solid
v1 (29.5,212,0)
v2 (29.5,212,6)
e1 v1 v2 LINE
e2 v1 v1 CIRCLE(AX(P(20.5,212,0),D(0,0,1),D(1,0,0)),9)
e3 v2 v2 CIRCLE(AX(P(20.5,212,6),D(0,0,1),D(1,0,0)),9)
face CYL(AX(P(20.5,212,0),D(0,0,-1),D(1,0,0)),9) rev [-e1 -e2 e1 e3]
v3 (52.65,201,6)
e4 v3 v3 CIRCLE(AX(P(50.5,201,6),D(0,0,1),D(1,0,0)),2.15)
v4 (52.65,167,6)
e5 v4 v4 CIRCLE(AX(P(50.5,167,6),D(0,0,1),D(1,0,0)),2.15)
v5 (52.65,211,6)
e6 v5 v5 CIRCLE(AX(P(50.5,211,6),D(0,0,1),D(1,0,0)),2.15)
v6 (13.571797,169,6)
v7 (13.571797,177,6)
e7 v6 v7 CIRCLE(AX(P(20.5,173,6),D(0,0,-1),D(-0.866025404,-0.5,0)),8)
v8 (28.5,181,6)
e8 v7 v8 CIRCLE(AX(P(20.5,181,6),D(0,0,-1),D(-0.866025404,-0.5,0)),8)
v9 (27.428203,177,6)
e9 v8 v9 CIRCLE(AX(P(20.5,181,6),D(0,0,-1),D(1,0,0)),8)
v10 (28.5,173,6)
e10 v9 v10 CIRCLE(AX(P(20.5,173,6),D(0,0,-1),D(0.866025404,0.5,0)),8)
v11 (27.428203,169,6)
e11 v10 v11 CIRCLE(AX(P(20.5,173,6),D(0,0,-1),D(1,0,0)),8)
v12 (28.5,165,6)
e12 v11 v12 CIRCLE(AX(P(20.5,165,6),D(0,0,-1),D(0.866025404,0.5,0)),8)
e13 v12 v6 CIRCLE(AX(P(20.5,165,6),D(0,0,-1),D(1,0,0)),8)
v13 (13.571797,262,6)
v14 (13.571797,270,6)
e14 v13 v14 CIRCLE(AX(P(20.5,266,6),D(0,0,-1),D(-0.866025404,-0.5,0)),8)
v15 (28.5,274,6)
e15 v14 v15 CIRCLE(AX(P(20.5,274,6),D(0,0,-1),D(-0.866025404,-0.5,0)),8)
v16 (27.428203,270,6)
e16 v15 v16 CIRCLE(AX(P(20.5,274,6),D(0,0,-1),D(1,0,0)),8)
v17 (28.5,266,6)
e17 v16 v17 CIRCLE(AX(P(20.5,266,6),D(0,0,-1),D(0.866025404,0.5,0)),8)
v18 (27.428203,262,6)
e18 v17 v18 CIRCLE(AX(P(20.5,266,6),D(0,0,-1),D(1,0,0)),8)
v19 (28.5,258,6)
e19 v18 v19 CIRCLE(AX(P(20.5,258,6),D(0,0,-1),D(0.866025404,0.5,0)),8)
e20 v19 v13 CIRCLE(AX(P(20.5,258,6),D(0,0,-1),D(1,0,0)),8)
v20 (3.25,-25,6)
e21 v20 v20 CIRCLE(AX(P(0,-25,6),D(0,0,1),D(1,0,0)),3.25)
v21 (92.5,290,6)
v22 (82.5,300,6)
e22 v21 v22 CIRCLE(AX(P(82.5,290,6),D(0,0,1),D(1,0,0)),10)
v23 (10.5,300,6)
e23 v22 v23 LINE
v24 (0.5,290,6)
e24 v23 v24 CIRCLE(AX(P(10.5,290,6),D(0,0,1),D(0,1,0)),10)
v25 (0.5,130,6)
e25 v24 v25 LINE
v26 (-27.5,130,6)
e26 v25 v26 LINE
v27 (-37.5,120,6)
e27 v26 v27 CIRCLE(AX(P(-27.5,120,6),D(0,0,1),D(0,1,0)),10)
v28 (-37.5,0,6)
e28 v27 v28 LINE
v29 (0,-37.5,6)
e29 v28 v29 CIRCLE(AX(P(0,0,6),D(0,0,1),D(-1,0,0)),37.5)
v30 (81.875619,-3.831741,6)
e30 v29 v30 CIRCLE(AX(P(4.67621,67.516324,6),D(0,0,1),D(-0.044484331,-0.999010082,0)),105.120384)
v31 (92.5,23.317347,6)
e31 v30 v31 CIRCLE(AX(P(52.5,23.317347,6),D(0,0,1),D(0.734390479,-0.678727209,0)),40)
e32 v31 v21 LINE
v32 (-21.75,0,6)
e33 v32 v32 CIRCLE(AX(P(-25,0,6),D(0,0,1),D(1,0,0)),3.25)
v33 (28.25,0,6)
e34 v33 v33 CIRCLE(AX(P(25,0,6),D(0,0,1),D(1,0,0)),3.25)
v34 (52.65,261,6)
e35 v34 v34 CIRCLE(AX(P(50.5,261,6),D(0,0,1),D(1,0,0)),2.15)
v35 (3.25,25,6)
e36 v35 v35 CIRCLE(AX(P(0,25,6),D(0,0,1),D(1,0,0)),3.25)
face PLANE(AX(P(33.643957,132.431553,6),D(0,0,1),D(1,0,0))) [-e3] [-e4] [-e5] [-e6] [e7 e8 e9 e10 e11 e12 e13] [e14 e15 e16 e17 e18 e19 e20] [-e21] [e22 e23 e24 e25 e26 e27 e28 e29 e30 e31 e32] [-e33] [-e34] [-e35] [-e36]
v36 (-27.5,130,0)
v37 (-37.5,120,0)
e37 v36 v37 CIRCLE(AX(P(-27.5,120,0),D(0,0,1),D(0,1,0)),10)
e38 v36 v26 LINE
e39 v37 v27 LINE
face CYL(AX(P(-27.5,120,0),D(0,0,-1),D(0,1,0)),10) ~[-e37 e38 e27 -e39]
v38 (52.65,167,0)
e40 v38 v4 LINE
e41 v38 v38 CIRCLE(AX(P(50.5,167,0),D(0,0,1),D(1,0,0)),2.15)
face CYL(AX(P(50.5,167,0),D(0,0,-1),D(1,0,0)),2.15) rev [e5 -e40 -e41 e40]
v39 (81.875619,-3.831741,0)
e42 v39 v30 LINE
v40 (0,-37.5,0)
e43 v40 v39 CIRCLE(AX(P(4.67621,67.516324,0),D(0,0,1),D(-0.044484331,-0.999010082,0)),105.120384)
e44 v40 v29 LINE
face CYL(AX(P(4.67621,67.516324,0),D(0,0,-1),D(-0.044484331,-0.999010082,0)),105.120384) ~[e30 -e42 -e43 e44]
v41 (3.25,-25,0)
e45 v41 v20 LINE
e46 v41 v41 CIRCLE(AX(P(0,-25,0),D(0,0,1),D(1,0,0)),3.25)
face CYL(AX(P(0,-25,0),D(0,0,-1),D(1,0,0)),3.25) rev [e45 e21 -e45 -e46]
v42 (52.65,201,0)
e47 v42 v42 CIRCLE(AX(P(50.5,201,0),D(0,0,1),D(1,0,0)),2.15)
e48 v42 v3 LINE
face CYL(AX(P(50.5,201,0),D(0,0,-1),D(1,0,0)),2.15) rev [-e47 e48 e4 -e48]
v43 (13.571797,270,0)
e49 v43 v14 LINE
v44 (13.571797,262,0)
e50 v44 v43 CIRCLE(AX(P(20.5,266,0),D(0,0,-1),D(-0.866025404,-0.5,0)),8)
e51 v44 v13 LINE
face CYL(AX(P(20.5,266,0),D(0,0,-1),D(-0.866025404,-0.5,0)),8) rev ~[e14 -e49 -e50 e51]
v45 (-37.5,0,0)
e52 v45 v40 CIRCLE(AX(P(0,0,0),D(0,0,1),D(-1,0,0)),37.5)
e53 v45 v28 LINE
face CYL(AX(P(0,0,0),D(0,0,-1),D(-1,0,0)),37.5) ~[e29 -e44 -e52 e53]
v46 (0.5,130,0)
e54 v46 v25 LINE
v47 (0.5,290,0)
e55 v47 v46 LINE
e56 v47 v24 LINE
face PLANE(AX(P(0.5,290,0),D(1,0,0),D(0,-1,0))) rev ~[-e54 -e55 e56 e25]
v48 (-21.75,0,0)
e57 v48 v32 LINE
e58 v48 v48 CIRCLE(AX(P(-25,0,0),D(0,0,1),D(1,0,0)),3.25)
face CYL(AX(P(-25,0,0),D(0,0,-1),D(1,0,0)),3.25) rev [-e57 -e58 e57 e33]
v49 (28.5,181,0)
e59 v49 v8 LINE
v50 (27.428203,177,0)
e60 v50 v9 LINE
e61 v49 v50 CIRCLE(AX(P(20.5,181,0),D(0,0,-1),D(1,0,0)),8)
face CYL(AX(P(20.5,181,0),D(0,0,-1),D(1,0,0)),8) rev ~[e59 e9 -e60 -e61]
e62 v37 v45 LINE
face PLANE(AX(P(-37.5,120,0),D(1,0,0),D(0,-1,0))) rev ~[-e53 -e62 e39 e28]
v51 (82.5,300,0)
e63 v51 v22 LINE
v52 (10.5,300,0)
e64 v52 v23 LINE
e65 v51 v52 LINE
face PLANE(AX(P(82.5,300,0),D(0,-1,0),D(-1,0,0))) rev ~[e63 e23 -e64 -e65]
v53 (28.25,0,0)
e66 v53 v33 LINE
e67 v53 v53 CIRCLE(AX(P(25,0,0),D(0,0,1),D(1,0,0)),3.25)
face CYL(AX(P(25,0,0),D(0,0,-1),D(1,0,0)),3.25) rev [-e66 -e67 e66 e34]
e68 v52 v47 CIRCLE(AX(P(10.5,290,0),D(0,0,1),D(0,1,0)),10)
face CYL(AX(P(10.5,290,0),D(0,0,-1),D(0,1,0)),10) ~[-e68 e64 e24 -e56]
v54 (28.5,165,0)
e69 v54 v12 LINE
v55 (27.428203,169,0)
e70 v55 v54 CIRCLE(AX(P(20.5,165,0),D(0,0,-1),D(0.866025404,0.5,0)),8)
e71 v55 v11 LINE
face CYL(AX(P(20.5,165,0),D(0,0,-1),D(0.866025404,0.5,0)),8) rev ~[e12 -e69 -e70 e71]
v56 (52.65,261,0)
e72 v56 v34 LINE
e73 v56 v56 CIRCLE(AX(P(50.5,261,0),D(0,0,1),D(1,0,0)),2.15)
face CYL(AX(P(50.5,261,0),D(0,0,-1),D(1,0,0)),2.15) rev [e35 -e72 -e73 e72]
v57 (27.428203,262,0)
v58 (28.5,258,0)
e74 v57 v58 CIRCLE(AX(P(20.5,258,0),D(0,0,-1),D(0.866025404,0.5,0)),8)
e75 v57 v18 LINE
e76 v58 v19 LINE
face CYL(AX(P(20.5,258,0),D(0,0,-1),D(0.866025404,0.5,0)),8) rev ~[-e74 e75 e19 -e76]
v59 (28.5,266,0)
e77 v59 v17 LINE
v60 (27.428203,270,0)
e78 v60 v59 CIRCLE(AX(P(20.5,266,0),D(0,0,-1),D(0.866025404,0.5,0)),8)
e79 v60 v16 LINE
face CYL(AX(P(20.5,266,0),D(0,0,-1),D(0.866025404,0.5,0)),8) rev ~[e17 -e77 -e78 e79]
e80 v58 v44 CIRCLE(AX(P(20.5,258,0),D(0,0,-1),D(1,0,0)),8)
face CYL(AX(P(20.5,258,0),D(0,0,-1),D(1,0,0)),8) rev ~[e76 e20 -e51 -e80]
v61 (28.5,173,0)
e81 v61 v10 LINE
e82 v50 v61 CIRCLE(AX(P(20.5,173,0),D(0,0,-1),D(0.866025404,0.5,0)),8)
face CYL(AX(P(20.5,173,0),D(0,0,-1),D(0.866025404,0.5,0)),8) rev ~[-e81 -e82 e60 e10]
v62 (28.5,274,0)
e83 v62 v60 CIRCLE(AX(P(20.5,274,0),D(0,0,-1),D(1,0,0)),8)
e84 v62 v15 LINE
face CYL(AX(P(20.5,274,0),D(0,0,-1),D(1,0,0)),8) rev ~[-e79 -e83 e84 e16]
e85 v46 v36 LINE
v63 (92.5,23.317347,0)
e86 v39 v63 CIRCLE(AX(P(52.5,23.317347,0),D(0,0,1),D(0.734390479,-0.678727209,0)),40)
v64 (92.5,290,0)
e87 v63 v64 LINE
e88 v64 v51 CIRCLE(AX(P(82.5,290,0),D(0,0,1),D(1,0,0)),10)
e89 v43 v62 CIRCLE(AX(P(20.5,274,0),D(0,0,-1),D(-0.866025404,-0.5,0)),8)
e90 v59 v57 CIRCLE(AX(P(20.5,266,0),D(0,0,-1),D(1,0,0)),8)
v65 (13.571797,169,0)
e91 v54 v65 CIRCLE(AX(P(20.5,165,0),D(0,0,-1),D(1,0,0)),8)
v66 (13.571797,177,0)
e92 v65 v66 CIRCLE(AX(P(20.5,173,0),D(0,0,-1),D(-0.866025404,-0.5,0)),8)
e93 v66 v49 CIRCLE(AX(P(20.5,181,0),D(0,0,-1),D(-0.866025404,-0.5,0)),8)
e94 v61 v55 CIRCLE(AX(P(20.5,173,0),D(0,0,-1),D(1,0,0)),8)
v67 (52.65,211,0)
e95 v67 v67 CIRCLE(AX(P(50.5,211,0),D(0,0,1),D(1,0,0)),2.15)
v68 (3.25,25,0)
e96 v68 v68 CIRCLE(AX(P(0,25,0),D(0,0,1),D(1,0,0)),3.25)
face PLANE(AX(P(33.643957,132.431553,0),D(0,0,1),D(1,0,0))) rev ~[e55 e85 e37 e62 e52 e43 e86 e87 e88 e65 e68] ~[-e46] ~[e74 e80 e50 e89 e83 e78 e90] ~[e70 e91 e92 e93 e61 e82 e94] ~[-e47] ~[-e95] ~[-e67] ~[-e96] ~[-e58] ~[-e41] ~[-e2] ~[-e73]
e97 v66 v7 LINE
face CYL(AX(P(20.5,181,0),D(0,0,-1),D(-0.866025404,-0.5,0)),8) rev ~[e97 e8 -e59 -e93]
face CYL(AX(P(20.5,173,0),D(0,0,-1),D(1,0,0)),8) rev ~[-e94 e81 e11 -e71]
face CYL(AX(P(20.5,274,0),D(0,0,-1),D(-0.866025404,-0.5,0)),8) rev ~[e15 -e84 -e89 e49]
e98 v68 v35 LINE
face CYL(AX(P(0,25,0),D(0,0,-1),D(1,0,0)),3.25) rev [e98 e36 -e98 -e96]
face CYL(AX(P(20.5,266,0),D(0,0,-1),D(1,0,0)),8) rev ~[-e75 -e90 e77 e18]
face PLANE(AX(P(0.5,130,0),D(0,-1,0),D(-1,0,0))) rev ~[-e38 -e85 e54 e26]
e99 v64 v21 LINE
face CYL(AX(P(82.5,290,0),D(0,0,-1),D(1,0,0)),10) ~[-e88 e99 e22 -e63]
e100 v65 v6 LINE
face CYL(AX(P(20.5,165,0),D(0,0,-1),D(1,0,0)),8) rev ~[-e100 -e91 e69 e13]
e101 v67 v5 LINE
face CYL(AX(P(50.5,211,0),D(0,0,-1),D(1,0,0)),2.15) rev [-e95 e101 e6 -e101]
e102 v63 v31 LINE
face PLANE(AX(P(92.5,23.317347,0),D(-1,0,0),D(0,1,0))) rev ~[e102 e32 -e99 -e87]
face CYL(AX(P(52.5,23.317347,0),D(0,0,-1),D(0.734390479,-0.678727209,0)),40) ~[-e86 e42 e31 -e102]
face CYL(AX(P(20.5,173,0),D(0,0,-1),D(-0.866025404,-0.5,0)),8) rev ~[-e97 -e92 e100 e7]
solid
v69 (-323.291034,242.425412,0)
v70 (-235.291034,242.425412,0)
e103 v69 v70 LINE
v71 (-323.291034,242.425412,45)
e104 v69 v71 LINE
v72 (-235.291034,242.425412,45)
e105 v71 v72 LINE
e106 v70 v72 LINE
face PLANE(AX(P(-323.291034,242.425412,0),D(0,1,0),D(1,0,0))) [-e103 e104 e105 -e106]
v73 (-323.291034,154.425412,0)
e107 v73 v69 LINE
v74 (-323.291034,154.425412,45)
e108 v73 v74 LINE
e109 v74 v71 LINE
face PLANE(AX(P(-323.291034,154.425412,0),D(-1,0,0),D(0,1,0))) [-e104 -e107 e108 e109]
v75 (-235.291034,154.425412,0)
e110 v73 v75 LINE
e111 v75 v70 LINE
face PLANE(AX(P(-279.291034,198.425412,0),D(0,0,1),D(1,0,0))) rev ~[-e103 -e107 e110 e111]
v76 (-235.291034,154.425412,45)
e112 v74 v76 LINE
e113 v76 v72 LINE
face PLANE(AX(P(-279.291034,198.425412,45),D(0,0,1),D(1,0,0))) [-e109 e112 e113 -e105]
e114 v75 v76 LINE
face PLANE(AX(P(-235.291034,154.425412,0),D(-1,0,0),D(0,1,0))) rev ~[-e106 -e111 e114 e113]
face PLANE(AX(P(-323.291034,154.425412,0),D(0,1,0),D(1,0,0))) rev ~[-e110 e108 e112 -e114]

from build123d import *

# Parameters (mm, degrees)
F0_R     = 3.25
F0_R_2   = 2.15
F0_R_3   = 9
F1_DEPTH = 6
F0_W     = 88
F0_H     = 88
F2_DEPTH = 45


# Not quite as in the source:
# - a feature names something its author has since deleted; it is built from what else it names


with BuildPart() as f1:
    # F0 (on Top) → F1 (new body)
    with BuildSketch(Plane.XY):
        with BuildLine():
            Line((-37.5, 29.9842730165), (-37.5, 0))
            ThreePointArc((-37.5, 0), (-26.5165042945, -26.5165042945), (0, -37.5))
            ThreePointArc((0, -37.5), (44.6548482199, -29.7050919513), (81.8756191651, -3.8317413512))
            ThreePointArc((81.8756191651, -3.8317413512), (89.7493272866, 8.7403920196), (92.5, 23.3173470068))
            Line((92.5, 23.3173470068), (92.5, 75.5242775083))
            Line((92.5, 75.5242775083), (92.5, 130))
            Line((92.5, 130), (92.5, 276))
            Line((92.5, 276), (92.5, 286.8150174618))
            Line((92.5, 286.8150174618), (92.5, 290))
            ThreePointArc((92.5, 290), (89.5710678119, 297.0710678119), (82.5, 300))
            Line((82.5, 300), (10.5, 300))
            ThreePointArc((10.5, 300), (3.4289321881, 297.0710678119), (0.5, 290))
            Line((0.5, 290), (0.5, 160))
            Line((0.5, 160), (0.5, 143.811336026))
            Line((0.5, 143.811336026), (0.5, 130))
            Line((0.5, 130), (-27.5, 130))
            ThreePointArc((-27.5, 130), (-34.5710678119, 127.0710678119), (-37.5, 120))
            Line((-37.5, 120), (-37.5, 29.9842730165))
        make_face()
        with Locations((-25, 0)):
            Circle(F0_R, mode=Mode.SUBTRACT)
        with Locations((0, -25)):
            Circle(F0_R, mode=Mode.SUBTRACT)
        with Locations((25, 0)):
            Circle(F0_R, mode=Mode.SUBTRACT)
        with Locations((0, 25)):
            Circle(F0_R, mode=Mode.SUBTRACT)
        with BuildLine():
            ThreePointArc((27.4282032303, 169), (28.2274066103, 167.0705523608), (28.5, 165))
            ThreePointArc((28.5, 165), (18.4294476392, 157.2725933897), (13.5717967697, 169))
            ThreePointArc((13.5717967697, 169), (12.5, 173), (13.5717967697, 177))
            ThreePointArc((13.5717967697, 177), (18.4294476392, 188.7274066103), (28.5, 181))
            ThreePointArc((28.5, 181), (28.2274066103, 178.9294476392), (27.4282032303, 177))
            ThreePointArc((27.4282032303, 177), (28.2274066103, 175.0705523608), (28.5, 173))
            ThreePointArc((28.5, 173), (28.2274066103, 170.9294476392), (27.4282032303, 169))
        make_face(mode=Mode.SUBTRACT)
        with Locations((50.5, 167)):
            Circle(F0_R_2, mode=Mode.SUBTRACT)
        with Locations((20.5, 212)):
            Circle(F0_R_3, mode=Mode.SUBTRACT)
        with Locations((50.5, 201)):
            Circle(F0_R_2, mode=Mode.SUBTRACT)
        with Locations((50.5, 211)):
            Circle(F0_R_2, mode=Mode.SUBTRACT)
        with BuildLine():
            ThreePointArc((27.4282032303, 262), (28.2274066103, 260.0705523608), (28.5, 258))
            ThreePointArc((28.5, 258), (18.4294476392, 250.2725933897), (13.5717967697, 262))
            ThreePointArc((13.5717967697, 262), (12.5, 266), (13.5717967697, 270))
            ThreePointArc((13.5717967697, 270), (18.4294476392, 281.7274066103), (28.5, 274))
            ThreePointArc((28.5, 274), (28.2274066103, 271.9294476392), (27.4282032303, 270))
            ThreePointArc((27.4282032303, 270), (28.2274066103, 268.0705523608), (28.5, 266))
            ThreePointArc((28.5, 266), (28.2274066103, 263.9294476392), (27.4282032303, 262))
        make_face(mode=Mode.SUBTRACT)
        with Locations((50.5, 261)):
            Circle(F0_R_2, mode=Mode.SUBTRACT)
    extrude(amount=F1_DEPTH)


with BuildPart() as f2:
    # F0 (on Top) → F2 (new body)
    with BuildSketch(Plane.XY):
        with Locations((-279.2910335064, 198.4254124165)):
            Rectangle(F0_W, F0_H)
    extrude(amount=F2_DEPTH)


solid = Compound([f1.part, f2.part])
